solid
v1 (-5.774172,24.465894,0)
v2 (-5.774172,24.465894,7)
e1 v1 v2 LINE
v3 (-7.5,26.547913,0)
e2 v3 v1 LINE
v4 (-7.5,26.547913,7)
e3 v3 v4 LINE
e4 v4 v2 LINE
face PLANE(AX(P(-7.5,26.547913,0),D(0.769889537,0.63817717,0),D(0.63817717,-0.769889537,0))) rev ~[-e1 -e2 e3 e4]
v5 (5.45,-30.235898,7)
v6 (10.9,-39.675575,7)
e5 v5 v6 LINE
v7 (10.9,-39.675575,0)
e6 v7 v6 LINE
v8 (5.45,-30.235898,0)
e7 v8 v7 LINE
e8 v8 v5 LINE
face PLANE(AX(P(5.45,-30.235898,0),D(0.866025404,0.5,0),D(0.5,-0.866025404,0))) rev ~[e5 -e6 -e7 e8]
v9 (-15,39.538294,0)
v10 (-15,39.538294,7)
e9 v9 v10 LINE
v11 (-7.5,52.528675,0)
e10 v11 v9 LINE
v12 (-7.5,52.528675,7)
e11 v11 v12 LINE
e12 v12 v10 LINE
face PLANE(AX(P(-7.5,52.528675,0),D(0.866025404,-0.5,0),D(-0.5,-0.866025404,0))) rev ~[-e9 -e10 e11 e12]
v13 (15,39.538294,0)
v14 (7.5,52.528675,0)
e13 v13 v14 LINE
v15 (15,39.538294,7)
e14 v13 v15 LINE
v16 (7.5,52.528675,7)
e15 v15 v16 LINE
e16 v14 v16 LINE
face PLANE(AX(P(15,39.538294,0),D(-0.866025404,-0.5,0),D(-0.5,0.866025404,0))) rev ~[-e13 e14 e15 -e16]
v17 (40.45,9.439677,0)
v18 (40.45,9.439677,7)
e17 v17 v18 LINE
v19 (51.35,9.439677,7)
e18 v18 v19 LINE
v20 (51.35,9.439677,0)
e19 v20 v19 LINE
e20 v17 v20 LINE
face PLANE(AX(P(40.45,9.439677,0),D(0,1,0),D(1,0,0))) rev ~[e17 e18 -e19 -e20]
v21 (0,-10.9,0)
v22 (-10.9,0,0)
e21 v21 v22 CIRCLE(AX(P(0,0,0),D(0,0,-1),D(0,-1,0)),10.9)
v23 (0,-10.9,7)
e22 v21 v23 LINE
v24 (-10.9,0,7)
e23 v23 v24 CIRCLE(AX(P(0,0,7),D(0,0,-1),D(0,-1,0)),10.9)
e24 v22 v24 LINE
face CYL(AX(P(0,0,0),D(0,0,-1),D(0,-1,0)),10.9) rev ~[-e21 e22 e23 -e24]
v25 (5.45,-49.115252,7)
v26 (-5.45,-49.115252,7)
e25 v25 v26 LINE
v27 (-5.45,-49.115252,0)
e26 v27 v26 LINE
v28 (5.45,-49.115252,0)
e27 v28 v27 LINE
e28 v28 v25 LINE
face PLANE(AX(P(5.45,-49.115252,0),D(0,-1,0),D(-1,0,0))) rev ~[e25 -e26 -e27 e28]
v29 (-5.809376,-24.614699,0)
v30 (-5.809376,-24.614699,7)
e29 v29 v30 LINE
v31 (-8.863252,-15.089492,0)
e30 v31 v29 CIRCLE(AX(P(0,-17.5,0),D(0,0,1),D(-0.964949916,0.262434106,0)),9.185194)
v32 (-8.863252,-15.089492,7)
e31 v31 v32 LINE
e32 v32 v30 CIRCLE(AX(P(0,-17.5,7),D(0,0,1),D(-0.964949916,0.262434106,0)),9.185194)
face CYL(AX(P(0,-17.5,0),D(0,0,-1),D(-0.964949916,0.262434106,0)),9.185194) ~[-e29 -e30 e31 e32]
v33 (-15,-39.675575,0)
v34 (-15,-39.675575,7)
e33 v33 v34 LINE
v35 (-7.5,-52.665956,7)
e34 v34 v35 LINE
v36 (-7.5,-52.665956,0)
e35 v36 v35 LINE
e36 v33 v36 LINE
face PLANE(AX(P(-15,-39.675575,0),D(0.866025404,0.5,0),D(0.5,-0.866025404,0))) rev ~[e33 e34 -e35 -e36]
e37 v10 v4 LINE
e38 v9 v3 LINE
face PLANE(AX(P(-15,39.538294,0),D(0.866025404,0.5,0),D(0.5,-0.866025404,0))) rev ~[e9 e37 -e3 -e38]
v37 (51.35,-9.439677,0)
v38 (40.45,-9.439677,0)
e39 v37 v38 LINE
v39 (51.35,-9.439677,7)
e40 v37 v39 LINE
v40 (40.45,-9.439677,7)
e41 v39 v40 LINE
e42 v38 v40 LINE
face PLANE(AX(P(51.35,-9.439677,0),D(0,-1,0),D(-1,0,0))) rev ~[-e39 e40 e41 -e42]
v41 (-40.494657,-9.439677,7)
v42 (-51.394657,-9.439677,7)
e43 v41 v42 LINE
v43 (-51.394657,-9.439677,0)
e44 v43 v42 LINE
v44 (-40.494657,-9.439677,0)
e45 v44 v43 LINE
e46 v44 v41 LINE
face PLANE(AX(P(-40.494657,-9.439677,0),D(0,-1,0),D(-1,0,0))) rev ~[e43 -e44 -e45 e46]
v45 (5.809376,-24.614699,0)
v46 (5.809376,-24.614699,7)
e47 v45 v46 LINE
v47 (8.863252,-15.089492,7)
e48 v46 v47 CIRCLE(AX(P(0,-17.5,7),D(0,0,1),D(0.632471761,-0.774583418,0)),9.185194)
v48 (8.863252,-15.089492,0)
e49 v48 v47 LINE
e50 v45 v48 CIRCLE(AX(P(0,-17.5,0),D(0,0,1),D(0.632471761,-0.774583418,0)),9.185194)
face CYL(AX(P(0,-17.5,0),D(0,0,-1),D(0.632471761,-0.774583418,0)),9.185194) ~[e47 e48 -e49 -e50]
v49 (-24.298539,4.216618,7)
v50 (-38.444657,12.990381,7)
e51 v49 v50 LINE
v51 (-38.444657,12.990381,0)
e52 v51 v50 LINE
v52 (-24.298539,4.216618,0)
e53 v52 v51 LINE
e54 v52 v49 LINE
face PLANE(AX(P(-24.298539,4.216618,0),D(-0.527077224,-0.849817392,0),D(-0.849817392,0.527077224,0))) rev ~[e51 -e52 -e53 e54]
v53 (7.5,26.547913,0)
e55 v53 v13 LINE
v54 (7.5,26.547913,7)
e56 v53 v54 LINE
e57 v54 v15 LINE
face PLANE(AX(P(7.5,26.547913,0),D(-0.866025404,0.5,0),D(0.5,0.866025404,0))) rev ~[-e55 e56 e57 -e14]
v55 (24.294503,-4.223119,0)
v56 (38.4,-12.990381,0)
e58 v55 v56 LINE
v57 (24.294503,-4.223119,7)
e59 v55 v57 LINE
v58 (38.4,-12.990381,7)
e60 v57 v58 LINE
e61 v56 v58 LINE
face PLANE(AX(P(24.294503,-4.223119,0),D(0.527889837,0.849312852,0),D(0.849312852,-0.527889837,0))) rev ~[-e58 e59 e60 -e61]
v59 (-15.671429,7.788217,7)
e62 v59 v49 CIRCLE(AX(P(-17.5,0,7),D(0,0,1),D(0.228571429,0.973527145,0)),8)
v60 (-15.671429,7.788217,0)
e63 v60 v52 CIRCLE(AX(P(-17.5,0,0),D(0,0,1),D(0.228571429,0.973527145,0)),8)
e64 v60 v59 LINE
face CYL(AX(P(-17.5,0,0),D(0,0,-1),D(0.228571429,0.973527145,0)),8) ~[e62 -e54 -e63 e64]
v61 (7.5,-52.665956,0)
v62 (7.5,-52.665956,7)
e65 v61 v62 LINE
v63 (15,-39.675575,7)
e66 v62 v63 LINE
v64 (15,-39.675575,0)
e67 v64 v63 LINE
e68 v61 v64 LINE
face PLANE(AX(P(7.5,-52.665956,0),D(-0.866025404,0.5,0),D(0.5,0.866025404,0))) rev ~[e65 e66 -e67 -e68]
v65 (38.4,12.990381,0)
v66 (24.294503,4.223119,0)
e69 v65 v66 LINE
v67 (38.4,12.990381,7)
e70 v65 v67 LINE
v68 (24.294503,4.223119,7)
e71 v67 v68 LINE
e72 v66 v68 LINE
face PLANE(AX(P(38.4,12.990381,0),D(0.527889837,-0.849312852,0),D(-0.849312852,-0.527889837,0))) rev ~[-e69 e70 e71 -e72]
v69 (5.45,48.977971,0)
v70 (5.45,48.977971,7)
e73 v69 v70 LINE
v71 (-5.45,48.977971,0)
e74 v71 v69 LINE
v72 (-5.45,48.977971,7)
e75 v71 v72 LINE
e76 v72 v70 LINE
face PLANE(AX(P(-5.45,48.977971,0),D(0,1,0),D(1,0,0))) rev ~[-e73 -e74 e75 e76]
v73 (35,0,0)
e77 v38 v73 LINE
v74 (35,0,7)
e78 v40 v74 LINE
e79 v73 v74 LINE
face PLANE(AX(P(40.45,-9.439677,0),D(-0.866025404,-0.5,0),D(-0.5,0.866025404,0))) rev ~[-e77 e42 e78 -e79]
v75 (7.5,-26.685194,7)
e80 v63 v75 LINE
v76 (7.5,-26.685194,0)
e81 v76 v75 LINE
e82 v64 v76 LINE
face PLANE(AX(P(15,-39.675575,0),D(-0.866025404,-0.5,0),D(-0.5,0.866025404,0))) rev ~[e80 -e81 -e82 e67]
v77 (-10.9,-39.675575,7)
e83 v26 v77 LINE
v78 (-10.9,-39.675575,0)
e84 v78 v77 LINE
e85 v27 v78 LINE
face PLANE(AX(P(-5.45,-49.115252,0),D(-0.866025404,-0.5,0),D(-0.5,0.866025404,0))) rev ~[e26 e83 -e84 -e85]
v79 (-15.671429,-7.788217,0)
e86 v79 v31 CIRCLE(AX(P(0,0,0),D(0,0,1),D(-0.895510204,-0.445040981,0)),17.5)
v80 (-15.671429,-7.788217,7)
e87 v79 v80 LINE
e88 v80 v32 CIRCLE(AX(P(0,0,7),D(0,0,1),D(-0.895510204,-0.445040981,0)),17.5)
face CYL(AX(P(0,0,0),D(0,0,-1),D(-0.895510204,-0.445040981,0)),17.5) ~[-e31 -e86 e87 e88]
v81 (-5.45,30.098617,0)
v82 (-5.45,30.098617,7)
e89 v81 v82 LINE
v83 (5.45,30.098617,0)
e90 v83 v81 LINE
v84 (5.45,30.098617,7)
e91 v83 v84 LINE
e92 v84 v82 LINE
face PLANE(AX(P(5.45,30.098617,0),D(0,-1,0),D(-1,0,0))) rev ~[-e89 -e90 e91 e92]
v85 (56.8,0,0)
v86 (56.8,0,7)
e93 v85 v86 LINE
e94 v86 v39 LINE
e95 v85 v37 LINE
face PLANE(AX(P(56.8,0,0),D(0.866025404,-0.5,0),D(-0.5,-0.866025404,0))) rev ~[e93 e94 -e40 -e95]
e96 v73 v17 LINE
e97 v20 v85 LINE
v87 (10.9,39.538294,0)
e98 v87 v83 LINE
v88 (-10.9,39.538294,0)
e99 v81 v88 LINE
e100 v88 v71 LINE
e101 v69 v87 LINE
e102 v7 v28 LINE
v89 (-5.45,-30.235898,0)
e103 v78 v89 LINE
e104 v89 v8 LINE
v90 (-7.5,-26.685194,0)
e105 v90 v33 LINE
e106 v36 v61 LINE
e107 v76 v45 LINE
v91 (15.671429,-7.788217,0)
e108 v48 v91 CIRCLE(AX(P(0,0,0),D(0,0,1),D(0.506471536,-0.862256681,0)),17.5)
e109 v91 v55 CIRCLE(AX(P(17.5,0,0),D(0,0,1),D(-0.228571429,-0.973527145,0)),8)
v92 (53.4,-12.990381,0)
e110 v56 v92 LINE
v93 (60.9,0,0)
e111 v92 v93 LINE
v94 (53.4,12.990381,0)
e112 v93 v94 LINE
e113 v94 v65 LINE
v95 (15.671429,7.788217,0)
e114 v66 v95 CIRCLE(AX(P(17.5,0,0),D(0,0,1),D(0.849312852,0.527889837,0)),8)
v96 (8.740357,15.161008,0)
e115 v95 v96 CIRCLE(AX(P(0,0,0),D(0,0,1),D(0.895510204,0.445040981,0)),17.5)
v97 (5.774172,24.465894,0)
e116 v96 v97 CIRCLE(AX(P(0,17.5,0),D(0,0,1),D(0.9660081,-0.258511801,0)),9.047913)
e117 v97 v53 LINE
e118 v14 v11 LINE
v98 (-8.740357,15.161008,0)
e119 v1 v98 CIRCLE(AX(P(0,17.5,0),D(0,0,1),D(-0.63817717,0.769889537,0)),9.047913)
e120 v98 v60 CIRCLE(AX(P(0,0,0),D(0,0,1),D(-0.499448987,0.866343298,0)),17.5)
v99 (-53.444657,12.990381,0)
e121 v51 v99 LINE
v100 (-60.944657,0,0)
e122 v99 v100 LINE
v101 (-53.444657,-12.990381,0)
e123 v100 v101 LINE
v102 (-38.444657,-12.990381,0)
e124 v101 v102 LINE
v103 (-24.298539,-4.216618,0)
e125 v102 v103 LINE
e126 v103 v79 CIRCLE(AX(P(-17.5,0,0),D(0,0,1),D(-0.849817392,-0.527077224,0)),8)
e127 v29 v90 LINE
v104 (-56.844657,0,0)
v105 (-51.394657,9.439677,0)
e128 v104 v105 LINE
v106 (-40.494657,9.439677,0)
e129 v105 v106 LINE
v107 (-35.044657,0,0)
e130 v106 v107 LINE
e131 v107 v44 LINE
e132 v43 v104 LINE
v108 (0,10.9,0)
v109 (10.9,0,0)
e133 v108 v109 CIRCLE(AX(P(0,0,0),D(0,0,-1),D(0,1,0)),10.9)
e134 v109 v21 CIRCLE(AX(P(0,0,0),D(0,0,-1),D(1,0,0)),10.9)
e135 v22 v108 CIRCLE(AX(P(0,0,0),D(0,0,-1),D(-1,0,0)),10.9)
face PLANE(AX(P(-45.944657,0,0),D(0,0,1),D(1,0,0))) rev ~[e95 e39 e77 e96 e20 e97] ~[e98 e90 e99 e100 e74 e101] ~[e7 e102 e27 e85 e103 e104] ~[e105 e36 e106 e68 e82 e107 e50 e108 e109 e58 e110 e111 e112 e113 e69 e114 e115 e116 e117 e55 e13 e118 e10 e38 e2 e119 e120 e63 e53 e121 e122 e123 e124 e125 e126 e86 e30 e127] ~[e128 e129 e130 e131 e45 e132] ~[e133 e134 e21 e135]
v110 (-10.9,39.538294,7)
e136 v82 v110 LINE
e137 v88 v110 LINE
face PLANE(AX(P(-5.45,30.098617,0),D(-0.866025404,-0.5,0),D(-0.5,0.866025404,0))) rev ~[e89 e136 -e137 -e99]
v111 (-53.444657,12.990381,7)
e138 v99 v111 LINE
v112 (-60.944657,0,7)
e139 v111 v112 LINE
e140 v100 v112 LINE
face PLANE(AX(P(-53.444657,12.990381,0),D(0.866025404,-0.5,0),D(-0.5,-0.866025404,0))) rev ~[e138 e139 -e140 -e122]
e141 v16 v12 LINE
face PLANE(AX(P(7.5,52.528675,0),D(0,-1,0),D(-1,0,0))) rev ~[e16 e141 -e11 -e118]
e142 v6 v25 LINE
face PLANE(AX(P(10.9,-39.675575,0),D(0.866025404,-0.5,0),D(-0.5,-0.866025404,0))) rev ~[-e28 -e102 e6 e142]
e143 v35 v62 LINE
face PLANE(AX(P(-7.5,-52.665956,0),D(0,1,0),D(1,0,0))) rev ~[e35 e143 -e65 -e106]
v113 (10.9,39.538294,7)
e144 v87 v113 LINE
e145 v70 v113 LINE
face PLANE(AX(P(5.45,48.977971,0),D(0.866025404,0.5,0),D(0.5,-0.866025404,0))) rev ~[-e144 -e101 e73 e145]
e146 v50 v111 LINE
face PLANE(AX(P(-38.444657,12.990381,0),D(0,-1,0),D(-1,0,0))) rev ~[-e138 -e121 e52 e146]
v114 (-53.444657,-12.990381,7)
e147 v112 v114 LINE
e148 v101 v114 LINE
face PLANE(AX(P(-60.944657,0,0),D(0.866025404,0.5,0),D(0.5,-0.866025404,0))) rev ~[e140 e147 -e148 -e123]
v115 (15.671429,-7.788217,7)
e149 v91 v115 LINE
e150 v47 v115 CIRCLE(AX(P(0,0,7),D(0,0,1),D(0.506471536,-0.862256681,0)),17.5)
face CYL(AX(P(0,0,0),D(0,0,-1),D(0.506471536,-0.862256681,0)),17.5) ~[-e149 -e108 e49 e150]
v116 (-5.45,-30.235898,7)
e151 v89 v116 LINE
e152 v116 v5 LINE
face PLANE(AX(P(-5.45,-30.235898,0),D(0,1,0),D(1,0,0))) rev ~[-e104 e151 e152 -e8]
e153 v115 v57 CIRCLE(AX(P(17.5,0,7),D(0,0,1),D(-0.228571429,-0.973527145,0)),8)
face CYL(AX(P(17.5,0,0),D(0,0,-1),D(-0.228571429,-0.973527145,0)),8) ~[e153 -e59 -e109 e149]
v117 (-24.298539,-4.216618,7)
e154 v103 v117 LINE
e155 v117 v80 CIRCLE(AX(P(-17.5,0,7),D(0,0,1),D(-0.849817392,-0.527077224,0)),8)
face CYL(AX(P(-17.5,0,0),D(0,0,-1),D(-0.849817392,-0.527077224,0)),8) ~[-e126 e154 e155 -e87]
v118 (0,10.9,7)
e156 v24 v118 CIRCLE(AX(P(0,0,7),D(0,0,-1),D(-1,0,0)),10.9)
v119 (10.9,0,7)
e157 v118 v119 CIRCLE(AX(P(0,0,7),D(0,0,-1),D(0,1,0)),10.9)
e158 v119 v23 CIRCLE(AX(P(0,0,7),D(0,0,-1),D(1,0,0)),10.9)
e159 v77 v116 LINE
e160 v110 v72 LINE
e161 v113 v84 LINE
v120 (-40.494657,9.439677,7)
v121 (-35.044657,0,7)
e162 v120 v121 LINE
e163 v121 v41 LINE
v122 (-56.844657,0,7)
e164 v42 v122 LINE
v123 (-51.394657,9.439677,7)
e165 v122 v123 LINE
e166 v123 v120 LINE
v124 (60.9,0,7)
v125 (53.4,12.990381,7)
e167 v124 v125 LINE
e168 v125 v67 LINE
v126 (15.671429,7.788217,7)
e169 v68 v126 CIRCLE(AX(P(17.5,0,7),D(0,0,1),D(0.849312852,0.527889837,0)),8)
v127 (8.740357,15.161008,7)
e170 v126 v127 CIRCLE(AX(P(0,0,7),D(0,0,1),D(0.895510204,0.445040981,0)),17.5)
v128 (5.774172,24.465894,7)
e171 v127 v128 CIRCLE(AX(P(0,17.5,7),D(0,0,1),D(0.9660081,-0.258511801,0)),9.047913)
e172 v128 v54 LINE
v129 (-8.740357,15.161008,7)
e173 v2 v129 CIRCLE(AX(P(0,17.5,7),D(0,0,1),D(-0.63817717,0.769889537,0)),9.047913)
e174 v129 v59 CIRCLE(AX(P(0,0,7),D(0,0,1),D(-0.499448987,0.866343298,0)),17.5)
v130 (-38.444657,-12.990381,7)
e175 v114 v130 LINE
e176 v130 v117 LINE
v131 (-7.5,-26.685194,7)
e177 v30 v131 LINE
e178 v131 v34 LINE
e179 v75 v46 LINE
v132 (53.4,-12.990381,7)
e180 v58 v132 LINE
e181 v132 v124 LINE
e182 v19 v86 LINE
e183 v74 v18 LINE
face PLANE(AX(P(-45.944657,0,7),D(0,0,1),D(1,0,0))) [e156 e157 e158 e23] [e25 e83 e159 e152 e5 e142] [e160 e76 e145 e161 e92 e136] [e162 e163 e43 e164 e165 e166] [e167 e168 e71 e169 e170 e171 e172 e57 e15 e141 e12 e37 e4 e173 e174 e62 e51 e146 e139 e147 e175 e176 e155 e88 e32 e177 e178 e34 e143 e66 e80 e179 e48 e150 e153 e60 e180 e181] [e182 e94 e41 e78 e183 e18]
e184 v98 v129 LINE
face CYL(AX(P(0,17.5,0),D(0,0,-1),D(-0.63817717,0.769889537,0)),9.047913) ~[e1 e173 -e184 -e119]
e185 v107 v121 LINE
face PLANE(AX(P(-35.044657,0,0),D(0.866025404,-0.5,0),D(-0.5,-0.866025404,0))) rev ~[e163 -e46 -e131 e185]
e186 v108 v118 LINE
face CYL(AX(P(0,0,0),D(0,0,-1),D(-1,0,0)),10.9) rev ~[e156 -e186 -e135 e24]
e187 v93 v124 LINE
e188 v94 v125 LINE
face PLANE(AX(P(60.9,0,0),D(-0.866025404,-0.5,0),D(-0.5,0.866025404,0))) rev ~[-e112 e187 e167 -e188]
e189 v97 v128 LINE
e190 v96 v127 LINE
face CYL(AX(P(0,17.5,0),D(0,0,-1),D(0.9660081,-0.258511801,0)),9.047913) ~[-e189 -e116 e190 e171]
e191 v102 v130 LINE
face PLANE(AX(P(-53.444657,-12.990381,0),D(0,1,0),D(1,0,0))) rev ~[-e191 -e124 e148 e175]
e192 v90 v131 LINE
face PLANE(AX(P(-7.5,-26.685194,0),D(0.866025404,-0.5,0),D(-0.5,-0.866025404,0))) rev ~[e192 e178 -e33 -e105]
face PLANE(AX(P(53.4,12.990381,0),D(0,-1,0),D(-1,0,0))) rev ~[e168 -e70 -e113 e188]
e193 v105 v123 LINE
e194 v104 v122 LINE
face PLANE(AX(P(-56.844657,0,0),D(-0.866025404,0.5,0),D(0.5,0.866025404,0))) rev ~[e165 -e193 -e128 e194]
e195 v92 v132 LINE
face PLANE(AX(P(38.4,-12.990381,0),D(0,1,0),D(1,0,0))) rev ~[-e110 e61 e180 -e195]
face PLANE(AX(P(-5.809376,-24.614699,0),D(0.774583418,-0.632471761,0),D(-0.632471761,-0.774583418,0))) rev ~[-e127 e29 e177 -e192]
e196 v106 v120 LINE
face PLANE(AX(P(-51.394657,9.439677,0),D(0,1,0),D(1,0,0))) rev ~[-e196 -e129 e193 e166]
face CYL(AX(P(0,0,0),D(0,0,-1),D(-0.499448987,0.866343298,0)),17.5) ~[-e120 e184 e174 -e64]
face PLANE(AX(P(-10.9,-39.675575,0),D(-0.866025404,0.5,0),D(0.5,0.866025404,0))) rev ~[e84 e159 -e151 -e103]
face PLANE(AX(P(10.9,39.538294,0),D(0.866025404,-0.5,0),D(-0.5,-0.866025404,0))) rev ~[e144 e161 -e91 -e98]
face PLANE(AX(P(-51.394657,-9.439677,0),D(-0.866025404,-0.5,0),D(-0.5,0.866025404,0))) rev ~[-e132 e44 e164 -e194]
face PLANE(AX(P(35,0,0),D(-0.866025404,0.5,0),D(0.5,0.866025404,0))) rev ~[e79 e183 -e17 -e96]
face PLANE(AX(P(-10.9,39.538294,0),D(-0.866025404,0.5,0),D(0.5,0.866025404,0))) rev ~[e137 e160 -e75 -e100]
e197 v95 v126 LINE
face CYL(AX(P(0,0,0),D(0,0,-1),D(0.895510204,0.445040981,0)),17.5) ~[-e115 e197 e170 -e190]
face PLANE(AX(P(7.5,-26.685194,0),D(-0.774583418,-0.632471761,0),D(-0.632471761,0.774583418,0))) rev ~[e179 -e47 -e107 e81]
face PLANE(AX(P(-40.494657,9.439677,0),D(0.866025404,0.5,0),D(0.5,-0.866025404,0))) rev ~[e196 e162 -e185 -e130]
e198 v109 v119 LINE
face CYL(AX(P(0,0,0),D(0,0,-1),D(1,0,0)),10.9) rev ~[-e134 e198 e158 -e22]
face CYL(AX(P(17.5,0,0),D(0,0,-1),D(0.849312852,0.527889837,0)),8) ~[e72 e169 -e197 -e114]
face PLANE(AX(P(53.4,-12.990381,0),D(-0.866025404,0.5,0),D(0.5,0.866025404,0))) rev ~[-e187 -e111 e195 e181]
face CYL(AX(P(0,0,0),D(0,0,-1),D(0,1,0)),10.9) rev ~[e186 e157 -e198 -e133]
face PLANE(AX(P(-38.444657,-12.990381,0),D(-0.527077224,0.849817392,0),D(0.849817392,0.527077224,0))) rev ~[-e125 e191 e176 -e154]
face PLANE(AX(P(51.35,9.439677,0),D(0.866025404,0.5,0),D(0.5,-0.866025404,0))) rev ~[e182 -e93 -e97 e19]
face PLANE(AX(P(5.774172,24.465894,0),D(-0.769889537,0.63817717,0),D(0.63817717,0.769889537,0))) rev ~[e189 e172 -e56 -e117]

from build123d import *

# Parameters (mm, degrees)
F1_DEPTH = 7


# Not quite as in the source:
# - a feature names something its author has since deleted; it is built from what else it names


with BuildPart() as f1:
    # F0 (on Top) → F1 (new body)
    with BuildSketch(Plane.XY):
        Polygon((-53.4446571767, -12.9903810568), (-38.4446571767, -12.9903810568), (-30.9446571767, 0), (-38.4446571767, 12.9903810568), (-53.4446571767, 12.9903810568), (-60.9446571767, 0), align=None)
        Polygon((-56.8446571767, 0), (-51.3946571767, 9.4396769013), (-40.4946571767, 9.4396769013), (-35.0446571767, 0), (-40.4946571767, -9.4396769013), (-51.3946571767, -9.4396769013), align=None, mode=Mode.SUBTRACT)
        with BuildLine():
            ThreePointArc((0, 10.9), (7.7074639149, 7.7074639149), (10.9, 0))
            Line((10.9, 0), (17.5, 0))
            ThreePointArc((17.5, 0), (17.0367250374, 4), (15.6714285714, 7.78821716))
            ThreePointArc((15.6714285714, 7.78821716), (12.7504247795, 11.9865202599), (8.7403572641, 15.1610077137))
            ThreePointArc((8.7403572641, 15.1610077137), (4.5239565101, 16.9051417473), (0, 17.5))
            Line((0, 17.5), (0, 10.9))
        make_face()
        with BuildLine():
            Line((17.5, 0), (10.9, 0))
            ThreePointArc((10.9, 0), (7.7074639149, -7.7074639149), (0, -10.9))
            Line((0, -10.9), (0, -17.5))
            ThreePointArc((0, -17.5), (4.5925968465, -16.8866235289), (8.8632518819, -15.0894919092))
            ThreePointArc((8.8632518819, -15.0894919092), (12.7990151761, -11.9346223452), (15.6714285714, -7.78821716))
            ThreePointArc((15.6714285714, -7.78821716), (17.0367250374, -4), (17.5, 0))
        make_face()
        with BuildLine():
            ThreePointArc((-10.9, 0), (-7.7074639149, 7.7074639149), (0, 10.9))
            Line((0, 10.9), (0, 17.5))
            ThreePointArc((0, 17.5), (-4.5239565101, 16.9051417473), (-8.7403572641, 15.1610077137))
            ThreePointArc((-8.7403572641, 15.1610077137), (-12.7504247795, 11.9865202599), (-15.6714285714, 7.78821716))
            ThreePointArc((-15.6714285714, 7.78821716), (-17.0367250374, 4), (-17.5, 0))
            Line((-17.5, 0), (-10.9, 0))
        make_face()
        Polygon((-7.5, 26.5479130202), (0, 26.5479130202), (7.5, 26.5479130202), (15, 39.5382940769), (7.5, 52.5286751337), (-7.5, 52.5286751337), (-15, 39.5382940769), align=None)
        Polygon((-10.9, 39.5382940769), (-5.45, 48.9779709782), (5.45, 48.9779709782), (10.9, 39.5382940769), (5.45, 30.0986171757), (-5.45, 30.0986171757), align=None, mode=Mode.SUBTRACT)
        Polygon((30.9, 0), (38.4, -12.9903810568), (53.4, -12.9903810568), (60.9, 0), (53.4, 12.9903810568), (38.4, 12.9903810568), align=None)
        Polygon((40.45, -9.4396769013), (35, 0), (40.45, 9.4396769013), (51.35, 9.4396769013), (56.8, 0), (51.35, -9.4396769013), align=None, mode=Mode.SUBTRACT)
        Polygon((7.5, -26.6851936929), (0, -26.6851936929), (-7.5, -26.6851936929), (-15, -39.6755747497), (-7.5, -52.6659558065), (7.5, -52.6659558065), (15, -39.6755747497), align=None)
        Polygon((-10.9, -39.6755747497), (-5.45, -30.2358978485), (5.45, -30.2358978485), (10.9, -39.6755747497), (5.45, -49.115251651), (-5.45, -49.115251651), align=None, mode=Mode.SUBTRACT)
        with BuildLine():
            Line((0, 26.5479130202), (0, 17.5))
            Line((0, 17.5), (5.7741715282, 24.4658935667))
            ThreePointArc((5.7741715282, 24.4658935667), (3.0690333104, 26.0115077724), (0, 26.5479130202))
        make_face()
        with BuildLine():
            Line((7.5, 26.5479130202), (0, 26.5479130202))
            ThreePointArc((0, 26.5479130202), (3.0690333104, 26.0115077724), (5.7741715282, 24.4658935667))
            Line((5.7741715282, 24.4658935667), (7.5, 26.5479130202))
        make_face()
        with BuildLine():
            ThreePointArc((-5.7741715282, 24.4658935667), (-3.0690333104, 26.0115077724), (0, 26.5479130202))
            Line((0, 26.5479130202), (-7.5, 26.5479130202))
            Line((-7.5, 26.5479130202), (-5.7741715282, 24.4658935667))
        make_face()
        with BuildLine():
            Line((-5.7741715282, 24.4658935667), (0, 17.5))
            Line((0, 17.5), (0, 26.5479130202))
            ThreePointArc((0, 26.5479130202), (-3.0690333104, 26.0115077724), (-5.7741715282, 24.4658935667))
        make_face()
        with BuildLine():
            Line((5.8093756333, -24.6146987236), (0, -17.5))
            Line((0, -17.5), (0, -26.6851936929))
            ThreePointArc((0, -26.6851936929), (3.0836583252, -26.1521000058), (5.8093756333, -24.6146987236))
        make_face()
        with BuildLine():
            ThreePointArc((5.8093756333, -24.6146987236), (3.0836583252, -26.1521000058), (0, -26.6851936929))
            Line((0, -26.6851936929), (7.5, -26.6851936929))
            Line((7.5, -26.6851936929), (5.8093756333, -24.6146987236))
        make_face()
        with BuildLine():
            Line((-7.5, -26.6851936929), (0, -26.6851936929))
            ThreePointArc((0, -26.6851936929), (-3.0836583252, -26.1521000058), (-5.8093756333, -24.6146987236))
            Line((-5.8093756333, -24.6146987236), (-7.5, -26.6851936929))
        make_face()
        with BuildLine():
            Line((0, -26.6851936929), (0, -17.5))
            Line((0, -17.5), (-5.8093756333, -24.6146987236))
            ThreePointArc((-5.8093756333, -24.6146987236), (-3.0836583252, -26.1521000058), (0, -26.6851936929))
        make_face()
        with BuildLine():
            Line((-38.4446571767, -12.9903810568), (-24.2985391386, -4.2166177892))
            ThreePointArc((-24.2985391386, -4.2166177892), (-25.1937738825, -2.1922234023), (-25.5, 0))
            Line((-25.5, 0), (-30.9446571767, 0))
            Line((-30.9446571767, 0), (-38.4446571767, -12.9903810568))
        make_face()
        with BuildLine():
            ThreePointArc((-25.5, 0), (-25.1937738825, 2.1922234023), (-24.2985391386, 4.2166177892))
            Line((-24.2985391386, 4.2166177892), (-38.4446571767, 12.9903810568))
            Line((-38.4446571767, 12.9903810568), (-30.9446571767, 0))
            Line((-30.9446571767, 0), (-25.5, 0))
        make_face()
        with BuildLine():
            ThreePointArc((25.5, 0), (25.1927245669, -2.1959027158), (24.2945028156, -4.2231186922))
            Line((24.2945028156, -4.2231186922), (38.4, -12.9903810568))
            Line((38.4, -12.9903810568), (30.9, 0))
            Line((30.9, 0), (25.5, 0))
        make_face()
        with BuildLine():
            Line((38.4, 12.9903810568), (24.2945028156, 4.2231186922))
            ThreePointArc((24.2945028156, 4.2231186922), (25.1927245669, 2.1959027158), (25.5, 0))
            Line((25.5, 0), (30.9, 0))
            Line((30.9, 0), (38.4, 12.9903810568))
        make_face()
        with BuildLine():
            Line((-24.2985391386, -4.2166177892), (-17.5, 0))
            Line((-17.5, 0), (-22.5, 0))
            Line((-22.5, 0), (-25.5, 0))
            ThreePointArc((-25.5, 0), (-25.1937738825, -2.1922234023), (-24.2985391386, -4.2166177892))
        make_face()
        with BuildLine():
            Line((-22.5, 0), (-17.5, 0))
            Line((-17.5, 0), (-24.2985391386, 4.2166177892))
            ThreePointArc((-24.2985391386, 4.2166177892), (-25.1937738825, 2.1922234023), (-25.5, 0))
            Line((-25.5, 0), (-22.5, 0))
        make_face()
        with BuildLine():
            Line((24.2945028156, 4.2231186922), (17.5, 0))
            Line((17.5, 0), (22.5, 0))
            Line((22.5, 0), (25.5, 0))
            ThreePointArc((25.5, 0), (25.1927245669, 2.1959027158), (24.2945028156, 4.2231186922))
        make_face()
        with BuildLine():
            Line((22.5, 0), (17.5, 0))
            Line((17.5, 0), (24.2945028156, -4.2231186922))
            ThreePointArc((24.2945028156, -4.2231186922), (25.1927245669, -2.1959027158), (25.5, 0))
            Line((25.5, 0), (22.5, 0))
        make_face()
        with BuildLine():
            Line((-5.8093756333, -24.6146987236), (0, -17.5))
            ThreePointArc((0, -17.5), (-4.5925968465, -16.8866235289), (-8.8632518819, -15.0894919092))
            ThreePointArc((-8.8632518819, -15.0894919092), (-8.7466502596, -20.3042632567), (-5.8093756333, -24.6146987236))
        make_face()
        with BuildLine():
            ThreePointArc((8.8632518819, -15.0894919092), (4.5925968465, -16.8866235289), (0, -17.5))
            Line((0, -17.5), (5.8093756333, -24.6146987236))
            ThreePointArc((5.8093756333, -24.6146987236), (8.7466502596, -20.3042632567), (8.8632518819, -15.0894919092))
        make_face()
        with BuildLine():
            Line((24.2945028156, -4.2231186922), (17.5, 0))
            ThreePointArc((17.5, 0), (17.0367250374, -4), (15.6714285714, -7.78821716))
            ThreePointArc((15.6714285714, -7.78821716), (20.5565667679, -7.3930642898), (24.2945028156, -4.2231186922))
        make_face()
        with BuildLine():
            ThreePointArc((15.6714285714, 7.78821716), (17.0367250374, 4), (17.5, 0))
            Line((17.5, 0), (24.2945028156, 4.2231186922))
            ThreePointArc((24.2945028156, 4.2231186922), (20.5565667679, 7.3930642898), (15.6714285714, 7.78821716))
        make_face()
        with BuildLine():
            ThreePointArc((-15.6714285714, -7.78821716), (-17.0367250374, -4), (-17.5, 0))
            Line((-17.5, 0), (-24.2985391386, -4.2166177892))
            ThreePointArc((-24.2985391386, -4.2166177892), (-20.5601021676, -7.3916016346), (-15.6714285714, -7.78821716))
        make_face()
        with BuildLine():
            Line((0, -17.5), (0, -10.9))
            ThreePointArc((0, -10.9), (-7.7074639149, -7.7074639149), (-10.9, 0))
            Line((-10.9, 0), (-17.5, 0))
            ThreePointArc((-17.5, 0), (-17.0367250374, -4), (-15.6714285714, -7.78821716))
            ThreePointArc((-15.6714285714, -7.78821716), (-12.7990151761, -11.9346223452), (-8.8632518819, -15.0894919092))
            ThreePointArc((-8.8632518819, -15.0894919092), (-4.5925968465, -16.8866235289), (0, -17.5))
        make_face()
        with BuildLine():
            Line((-24.2985391386, 4.2166177892), (-17.5, 0))
            ThreePointArc((-17.5, 0), (-17.0367250374, 4), (-15.6714285714, 7.78821716))
            ThreePointArc((-15.6714285714, 7.78821716), (-20.5601021676, 7.3916016346), (-24.2985391386, 4.2166177892))
        make_face()
        with BuildLine():
            ThreePointArc((-8.7403572641, 15.1610077137), (-4.5239565101, 16.9051417473), (0, 17.5))
            Line((0, 17.5), (-5.7741715282, 24.4658935667))
            ThreePointArc((-5.7741715282, 24.4658935667), (-8.6205053042, 20.2480208005), (-8.7403572641, 15.1610077137))
        make_face()
        with BuildLine():
            Line((5.7741715282, 24.4658935667), (0, 17.5))
            ThreePointArc((0, 17.5), (4.5239565101, 16.9051417473), (8.7403572641, 15.1610077137))
            ThreePointArc((8.7403572641, 15.1610077137), (8.6205053042, 20.2480208005), (5.7741715282, 24.4658935667))
        make_face()
    extrude(amount=F1_DEPTH)


solid = f1.part
